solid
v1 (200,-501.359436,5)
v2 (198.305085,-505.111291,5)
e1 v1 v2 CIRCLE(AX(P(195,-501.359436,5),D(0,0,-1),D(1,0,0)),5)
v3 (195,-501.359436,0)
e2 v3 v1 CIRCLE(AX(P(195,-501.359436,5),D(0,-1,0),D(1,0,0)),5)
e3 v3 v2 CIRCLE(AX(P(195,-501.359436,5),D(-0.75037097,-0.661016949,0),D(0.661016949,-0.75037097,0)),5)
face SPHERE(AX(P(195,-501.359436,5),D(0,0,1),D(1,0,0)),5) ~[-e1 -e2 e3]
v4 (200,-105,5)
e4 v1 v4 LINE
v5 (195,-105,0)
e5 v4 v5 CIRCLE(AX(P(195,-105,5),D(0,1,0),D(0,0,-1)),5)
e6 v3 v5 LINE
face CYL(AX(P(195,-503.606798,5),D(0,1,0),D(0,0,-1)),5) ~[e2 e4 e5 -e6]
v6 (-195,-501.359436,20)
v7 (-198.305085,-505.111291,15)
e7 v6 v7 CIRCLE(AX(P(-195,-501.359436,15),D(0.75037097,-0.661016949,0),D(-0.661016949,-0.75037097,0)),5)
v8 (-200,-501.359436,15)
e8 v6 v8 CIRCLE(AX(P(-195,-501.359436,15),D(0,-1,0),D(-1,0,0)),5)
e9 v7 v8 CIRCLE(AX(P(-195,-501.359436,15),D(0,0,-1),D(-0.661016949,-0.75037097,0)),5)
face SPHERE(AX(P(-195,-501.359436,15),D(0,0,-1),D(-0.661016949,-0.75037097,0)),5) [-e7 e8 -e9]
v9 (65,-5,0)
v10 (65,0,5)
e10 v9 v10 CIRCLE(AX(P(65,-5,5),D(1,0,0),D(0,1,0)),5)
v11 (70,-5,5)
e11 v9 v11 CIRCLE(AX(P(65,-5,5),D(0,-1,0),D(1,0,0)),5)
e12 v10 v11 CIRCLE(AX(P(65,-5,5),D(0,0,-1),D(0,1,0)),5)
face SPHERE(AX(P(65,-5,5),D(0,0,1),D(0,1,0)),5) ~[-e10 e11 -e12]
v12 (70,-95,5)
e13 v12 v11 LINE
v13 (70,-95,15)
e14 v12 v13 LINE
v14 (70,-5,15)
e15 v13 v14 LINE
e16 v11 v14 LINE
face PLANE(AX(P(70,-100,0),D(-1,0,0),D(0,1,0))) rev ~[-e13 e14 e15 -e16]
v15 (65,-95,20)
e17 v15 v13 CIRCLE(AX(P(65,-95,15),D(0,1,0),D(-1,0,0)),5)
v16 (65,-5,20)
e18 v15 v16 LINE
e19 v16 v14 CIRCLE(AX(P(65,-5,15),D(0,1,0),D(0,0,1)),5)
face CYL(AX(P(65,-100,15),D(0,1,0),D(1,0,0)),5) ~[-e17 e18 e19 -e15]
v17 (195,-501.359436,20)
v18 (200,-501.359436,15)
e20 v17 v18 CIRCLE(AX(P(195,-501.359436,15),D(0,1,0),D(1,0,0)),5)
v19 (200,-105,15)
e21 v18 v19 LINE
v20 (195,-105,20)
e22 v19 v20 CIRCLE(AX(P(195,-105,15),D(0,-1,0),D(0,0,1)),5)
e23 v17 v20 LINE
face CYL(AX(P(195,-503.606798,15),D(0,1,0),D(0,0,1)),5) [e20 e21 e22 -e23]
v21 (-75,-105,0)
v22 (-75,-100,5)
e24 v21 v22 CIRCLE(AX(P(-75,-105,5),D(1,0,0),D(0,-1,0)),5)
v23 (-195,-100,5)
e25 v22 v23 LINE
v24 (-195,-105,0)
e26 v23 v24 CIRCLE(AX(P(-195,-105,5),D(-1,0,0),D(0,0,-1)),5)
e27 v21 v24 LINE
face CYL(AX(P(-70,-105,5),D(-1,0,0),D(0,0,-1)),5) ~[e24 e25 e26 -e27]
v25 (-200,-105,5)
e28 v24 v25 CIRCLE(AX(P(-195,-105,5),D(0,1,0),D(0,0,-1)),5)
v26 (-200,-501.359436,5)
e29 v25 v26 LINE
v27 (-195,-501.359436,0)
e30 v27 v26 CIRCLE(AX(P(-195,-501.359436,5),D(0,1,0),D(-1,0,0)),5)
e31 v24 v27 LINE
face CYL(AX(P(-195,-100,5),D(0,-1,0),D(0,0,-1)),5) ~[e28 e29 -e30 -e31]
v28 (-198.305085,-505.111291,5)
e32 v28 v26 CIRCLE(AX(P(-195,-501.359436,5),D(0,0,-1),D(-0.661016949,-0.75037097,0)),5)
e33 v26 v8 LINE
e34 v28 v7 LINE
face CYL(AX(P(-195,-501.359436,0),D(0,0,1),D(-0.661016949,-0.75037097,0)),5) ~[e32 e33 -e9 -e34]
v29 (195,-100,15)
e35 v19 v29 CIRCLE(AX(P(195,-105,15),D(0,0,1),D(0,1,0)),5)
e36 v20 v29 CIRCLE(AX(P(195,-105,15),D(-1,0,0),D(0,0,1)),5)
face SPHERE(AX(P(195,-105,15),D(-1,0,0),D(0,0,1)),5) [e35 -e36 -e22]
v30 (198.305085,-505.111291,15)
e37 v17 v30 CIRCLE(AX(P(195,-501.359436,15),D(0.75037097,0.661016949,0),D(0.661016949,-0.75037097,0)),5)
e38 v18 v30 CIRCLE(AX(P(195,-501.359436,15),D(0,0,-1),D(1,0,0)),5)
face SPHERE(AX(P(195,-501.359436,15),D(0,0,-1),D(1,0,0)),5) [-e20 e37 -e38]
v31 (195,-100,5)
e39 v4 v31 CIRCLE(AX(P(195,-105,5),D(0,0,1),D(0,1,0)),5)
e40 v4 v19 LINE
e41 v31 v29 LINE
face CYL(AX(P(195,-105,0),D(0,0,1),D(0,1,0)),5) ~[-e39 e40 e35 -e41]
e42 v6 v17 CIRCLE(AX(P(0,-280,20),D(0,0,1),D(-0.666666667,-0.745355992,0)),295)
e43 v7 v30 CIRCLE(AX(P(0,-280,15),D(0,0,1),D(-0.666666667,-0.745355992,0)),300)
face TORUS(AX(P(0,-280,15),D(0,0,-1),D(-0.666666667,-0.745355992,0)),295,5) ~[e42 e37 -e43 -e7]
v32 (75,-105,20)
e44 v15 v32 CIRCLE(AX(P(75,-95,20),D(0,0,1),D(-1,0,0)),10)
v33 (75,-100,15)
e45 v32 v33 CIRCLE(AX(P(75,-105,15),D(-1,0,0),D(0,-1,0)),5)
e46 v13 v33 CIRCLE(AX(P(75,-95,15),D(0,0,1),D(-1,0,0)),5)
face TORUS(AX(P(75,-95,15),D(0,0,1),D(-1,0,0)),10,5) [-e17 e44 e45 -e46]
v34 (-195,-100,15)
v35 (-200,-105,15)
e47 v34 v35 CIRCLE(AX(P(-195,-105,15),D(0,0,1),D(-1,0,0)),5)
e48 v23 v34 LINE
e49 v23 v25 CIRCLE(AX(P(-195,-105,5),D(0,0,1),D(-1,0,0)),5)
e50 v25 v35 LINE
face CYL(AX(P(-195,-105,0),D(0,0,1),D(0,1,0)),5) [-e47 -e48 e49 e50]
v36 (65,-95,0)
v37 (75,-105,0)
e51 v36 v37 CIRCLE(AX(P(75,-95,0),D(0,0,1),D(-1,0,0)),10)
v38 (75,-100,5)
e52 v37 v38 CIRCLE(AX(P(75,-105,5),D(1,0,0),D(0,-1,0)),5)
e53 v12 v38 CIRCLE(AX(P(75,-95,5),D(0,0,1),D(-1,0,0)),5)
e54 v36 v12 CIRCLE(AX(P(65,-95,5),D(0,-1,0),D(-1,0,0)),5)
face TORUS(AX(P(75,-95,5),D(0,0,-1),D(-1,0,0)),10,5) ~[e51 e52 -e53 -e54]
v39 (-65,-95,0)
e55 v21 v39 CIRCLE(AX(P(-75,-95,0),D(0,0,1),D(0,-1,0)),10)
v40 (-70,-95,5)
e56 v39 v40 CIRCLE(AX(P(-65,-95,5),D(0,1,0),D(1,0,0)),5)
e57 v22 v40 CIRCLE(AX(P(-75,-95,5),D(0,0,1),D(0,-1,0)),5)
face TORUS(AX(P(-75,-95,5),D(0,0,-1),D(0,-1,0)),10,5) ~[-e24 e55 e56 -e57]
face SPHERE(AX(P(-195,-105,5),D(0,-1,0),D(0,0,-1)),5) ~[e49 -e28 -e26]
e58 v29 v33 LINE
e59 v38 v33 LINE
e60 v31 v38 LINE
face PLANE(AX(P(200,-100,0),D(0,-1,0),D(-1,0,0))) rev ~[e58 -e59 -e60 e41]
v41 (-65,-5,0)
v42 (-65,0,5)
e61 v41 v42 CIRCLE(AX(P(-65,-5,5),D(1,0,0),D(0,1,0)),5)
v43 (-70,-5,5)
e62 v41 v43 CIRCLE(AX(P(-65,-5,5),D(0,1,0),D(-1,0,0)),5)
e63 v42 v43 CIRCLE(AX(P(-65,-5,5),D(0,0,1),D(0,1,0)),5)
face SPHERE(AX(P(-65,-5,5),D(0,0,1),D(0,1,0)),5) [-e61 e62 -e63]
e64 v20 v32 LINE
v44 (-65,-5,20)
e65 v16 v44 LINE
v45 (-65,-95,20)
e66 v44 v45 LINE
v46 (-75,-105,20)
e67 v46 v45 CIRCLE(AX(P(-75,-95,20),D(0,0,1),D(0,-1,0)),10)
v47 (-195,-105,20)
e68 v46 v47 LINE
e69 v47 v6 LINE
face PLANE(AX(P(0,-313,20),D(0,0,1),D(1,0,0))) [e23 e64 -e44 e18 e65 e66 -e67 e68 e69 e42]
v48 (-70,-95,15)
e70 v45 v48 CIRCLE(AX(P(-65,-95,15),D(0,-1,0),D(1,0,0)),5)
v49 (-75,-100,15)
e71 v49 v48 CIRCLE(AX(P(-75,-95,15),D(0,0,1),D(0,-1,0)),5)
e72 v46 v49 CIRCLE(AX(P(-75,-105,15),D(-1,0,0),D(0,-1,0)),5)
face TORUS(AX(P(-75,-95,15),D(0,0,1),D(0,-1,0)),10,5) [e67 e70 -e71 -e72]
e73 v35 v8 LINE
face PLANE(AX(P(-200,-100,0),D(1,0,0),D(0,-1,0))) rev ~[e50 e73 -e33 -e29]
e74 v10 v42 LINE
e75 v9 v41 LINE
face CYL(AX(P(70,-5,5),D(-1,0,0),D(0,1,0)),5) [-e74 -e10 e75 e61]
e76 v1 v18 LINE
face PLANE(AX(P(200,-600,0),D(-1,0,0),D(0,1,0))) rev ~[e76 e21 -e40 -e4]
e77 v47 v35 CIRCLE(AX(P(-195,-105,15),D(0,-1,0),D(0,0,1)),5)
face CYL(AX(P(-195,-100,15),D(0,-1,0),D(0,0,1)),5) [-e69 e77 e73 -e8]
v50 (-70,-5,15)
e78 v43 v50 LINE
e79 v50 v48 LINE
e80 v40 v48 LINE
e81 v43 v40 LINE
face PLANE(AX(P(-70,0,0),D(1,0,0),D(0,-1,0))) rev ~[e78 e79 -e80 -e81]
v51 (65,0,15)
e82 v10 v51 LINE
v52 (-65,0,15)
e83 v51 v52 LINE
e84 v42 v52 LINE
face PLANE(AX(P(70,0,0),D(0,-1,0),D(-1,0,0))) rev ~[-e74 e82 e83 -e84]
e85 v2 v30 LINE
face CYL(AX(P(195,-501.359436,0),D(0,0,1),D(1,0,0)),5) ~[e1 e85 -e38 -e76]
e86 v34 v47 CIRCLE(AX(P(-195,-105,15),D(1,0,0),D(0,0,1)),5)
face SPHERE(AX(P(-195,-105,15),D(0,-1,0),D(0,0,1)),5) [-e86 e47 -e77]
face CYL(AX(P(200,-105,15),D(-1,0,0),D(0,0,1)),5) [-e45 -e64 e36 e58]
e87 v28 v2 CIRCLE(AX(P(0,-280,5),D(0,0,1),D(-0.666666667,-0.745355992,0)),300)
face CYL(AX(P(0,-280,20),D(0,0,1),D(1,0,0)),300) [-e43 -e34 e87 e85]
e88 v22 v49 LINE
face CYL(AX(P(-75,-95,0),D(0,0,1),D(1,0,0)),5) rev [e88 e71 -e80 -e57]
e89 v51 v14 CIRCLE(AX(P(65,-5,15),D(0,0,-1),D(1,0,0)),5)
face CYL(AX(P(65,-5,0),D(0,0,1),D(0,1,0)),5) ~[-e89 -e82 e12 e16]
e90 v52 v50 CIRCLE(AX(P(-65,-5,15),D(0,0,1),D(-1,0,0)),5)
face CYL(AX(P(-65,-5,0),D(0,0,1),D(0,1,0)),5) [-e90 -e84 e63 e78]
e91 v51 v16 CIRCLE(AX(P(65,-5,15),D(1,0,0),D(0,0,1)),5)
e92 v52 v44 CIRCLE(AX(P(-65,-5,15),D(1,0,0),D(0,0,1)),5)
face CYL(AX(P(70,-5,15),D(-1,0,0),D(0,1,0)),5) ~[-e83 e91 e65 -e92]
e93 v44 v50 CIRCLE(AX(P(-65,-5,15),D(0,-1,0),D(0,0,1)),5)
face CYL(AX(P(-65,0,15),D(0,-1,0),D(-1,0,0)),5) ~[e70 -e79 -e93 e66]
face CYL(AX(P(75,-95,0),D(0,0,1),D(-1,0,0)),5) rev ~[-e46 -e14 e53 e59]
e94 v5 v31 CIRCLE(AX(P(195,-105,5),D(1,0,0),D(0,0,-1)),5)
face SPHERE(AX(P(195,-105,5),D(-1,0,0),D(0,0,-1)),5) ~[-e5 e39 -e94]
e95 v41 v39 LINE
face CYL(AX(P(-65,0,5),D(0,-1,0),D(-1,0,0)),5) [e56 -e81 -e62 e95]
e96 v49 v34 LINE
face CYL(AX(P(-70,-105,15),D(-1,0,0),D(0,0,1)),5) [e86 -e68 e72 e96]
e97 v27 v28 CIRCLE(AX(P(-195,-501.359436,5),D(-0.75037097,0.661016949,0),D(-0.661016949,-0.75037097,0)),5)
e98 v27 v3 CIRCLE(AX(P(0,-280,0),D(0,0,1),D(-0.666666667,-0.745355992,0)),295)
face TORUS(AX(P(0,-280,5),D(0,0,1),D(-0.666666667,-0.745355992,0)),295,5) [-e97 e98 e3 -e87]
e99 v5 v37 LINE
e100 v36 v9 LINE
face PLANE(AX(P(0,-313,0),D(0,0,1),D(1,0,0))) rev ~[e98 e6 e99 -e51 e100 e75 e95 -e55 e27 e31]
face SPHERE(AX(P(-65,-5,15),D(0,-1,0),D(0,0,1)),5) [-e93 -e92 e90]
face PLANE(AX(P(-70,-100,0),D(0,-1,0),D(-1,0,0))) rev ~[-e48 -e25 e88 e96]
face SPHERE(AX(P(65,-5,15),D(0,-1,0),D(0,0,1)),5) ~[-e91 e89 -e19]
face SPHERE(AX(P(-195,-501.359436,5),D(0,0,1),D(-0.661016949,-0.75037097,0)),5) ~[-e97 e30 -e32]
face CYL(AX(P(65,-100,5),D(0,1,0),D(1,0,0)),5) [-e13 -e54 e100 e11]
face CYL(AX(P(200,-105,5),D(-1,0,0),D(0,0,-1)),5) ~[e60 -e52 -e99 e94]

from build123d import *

# Parameters (mm, degrees)
F1_DEPTH = 20
F2_R     = 300
F3_DEPTH = 20.001
F4_R     = 5


with BuildPart() as f1:
    # F0 (on Top) → F1 (new body)
    with BuildSketch(Plane.XY):
        Polygon((70, 0), (-70, 0), (-70, -100), (-200, -100), (-200, -600), (200, -600), (200, -100), (70, -100), align=None)
    extrude(amount=F1_DEPTH)

    # F2 (on face) → F3 (intersect, through all)
    with BuildSketch(Plane.XY.offset(20)):
        with Locations((0, -280)):
            Circle(F2_R)
    extrude(amount=-F3_DEPTH, mode=Mode.INTERSECT)

    # F4
    f4_edges = [f1.edges().sort_by_distance(p)[0] for p in [
        (70, -50, 20),
        (135, -100, 20),
        (200, -301.803399, 20),
        (0, -580, 20),
        (-200, -301.803399, 20),
        (-135, -100, 20),
        (-70, -50, 20),
        (0, 0, 20),
        (70, 0, 10),
        (-70, 0, 10),
        (0, 0, 0),
        (70, -50, 0),
        (135, -100, 0),
        (200, -301.803399, 0),
        (0, -580, 0),
        (-200, -301.803399, 0),
        (-135, -100, 0),
        (-70, -50, 0),
        (200, -100, 10),
        (70, -100, 10),
        (-70, -100, 10),
        (-200, -100, 10),
        (200, -503.606798, 10),
        (-200, -503.606798, 10),
    ]]
    fillet(f4_edges, radius=F4_R)


solid = f1.part
